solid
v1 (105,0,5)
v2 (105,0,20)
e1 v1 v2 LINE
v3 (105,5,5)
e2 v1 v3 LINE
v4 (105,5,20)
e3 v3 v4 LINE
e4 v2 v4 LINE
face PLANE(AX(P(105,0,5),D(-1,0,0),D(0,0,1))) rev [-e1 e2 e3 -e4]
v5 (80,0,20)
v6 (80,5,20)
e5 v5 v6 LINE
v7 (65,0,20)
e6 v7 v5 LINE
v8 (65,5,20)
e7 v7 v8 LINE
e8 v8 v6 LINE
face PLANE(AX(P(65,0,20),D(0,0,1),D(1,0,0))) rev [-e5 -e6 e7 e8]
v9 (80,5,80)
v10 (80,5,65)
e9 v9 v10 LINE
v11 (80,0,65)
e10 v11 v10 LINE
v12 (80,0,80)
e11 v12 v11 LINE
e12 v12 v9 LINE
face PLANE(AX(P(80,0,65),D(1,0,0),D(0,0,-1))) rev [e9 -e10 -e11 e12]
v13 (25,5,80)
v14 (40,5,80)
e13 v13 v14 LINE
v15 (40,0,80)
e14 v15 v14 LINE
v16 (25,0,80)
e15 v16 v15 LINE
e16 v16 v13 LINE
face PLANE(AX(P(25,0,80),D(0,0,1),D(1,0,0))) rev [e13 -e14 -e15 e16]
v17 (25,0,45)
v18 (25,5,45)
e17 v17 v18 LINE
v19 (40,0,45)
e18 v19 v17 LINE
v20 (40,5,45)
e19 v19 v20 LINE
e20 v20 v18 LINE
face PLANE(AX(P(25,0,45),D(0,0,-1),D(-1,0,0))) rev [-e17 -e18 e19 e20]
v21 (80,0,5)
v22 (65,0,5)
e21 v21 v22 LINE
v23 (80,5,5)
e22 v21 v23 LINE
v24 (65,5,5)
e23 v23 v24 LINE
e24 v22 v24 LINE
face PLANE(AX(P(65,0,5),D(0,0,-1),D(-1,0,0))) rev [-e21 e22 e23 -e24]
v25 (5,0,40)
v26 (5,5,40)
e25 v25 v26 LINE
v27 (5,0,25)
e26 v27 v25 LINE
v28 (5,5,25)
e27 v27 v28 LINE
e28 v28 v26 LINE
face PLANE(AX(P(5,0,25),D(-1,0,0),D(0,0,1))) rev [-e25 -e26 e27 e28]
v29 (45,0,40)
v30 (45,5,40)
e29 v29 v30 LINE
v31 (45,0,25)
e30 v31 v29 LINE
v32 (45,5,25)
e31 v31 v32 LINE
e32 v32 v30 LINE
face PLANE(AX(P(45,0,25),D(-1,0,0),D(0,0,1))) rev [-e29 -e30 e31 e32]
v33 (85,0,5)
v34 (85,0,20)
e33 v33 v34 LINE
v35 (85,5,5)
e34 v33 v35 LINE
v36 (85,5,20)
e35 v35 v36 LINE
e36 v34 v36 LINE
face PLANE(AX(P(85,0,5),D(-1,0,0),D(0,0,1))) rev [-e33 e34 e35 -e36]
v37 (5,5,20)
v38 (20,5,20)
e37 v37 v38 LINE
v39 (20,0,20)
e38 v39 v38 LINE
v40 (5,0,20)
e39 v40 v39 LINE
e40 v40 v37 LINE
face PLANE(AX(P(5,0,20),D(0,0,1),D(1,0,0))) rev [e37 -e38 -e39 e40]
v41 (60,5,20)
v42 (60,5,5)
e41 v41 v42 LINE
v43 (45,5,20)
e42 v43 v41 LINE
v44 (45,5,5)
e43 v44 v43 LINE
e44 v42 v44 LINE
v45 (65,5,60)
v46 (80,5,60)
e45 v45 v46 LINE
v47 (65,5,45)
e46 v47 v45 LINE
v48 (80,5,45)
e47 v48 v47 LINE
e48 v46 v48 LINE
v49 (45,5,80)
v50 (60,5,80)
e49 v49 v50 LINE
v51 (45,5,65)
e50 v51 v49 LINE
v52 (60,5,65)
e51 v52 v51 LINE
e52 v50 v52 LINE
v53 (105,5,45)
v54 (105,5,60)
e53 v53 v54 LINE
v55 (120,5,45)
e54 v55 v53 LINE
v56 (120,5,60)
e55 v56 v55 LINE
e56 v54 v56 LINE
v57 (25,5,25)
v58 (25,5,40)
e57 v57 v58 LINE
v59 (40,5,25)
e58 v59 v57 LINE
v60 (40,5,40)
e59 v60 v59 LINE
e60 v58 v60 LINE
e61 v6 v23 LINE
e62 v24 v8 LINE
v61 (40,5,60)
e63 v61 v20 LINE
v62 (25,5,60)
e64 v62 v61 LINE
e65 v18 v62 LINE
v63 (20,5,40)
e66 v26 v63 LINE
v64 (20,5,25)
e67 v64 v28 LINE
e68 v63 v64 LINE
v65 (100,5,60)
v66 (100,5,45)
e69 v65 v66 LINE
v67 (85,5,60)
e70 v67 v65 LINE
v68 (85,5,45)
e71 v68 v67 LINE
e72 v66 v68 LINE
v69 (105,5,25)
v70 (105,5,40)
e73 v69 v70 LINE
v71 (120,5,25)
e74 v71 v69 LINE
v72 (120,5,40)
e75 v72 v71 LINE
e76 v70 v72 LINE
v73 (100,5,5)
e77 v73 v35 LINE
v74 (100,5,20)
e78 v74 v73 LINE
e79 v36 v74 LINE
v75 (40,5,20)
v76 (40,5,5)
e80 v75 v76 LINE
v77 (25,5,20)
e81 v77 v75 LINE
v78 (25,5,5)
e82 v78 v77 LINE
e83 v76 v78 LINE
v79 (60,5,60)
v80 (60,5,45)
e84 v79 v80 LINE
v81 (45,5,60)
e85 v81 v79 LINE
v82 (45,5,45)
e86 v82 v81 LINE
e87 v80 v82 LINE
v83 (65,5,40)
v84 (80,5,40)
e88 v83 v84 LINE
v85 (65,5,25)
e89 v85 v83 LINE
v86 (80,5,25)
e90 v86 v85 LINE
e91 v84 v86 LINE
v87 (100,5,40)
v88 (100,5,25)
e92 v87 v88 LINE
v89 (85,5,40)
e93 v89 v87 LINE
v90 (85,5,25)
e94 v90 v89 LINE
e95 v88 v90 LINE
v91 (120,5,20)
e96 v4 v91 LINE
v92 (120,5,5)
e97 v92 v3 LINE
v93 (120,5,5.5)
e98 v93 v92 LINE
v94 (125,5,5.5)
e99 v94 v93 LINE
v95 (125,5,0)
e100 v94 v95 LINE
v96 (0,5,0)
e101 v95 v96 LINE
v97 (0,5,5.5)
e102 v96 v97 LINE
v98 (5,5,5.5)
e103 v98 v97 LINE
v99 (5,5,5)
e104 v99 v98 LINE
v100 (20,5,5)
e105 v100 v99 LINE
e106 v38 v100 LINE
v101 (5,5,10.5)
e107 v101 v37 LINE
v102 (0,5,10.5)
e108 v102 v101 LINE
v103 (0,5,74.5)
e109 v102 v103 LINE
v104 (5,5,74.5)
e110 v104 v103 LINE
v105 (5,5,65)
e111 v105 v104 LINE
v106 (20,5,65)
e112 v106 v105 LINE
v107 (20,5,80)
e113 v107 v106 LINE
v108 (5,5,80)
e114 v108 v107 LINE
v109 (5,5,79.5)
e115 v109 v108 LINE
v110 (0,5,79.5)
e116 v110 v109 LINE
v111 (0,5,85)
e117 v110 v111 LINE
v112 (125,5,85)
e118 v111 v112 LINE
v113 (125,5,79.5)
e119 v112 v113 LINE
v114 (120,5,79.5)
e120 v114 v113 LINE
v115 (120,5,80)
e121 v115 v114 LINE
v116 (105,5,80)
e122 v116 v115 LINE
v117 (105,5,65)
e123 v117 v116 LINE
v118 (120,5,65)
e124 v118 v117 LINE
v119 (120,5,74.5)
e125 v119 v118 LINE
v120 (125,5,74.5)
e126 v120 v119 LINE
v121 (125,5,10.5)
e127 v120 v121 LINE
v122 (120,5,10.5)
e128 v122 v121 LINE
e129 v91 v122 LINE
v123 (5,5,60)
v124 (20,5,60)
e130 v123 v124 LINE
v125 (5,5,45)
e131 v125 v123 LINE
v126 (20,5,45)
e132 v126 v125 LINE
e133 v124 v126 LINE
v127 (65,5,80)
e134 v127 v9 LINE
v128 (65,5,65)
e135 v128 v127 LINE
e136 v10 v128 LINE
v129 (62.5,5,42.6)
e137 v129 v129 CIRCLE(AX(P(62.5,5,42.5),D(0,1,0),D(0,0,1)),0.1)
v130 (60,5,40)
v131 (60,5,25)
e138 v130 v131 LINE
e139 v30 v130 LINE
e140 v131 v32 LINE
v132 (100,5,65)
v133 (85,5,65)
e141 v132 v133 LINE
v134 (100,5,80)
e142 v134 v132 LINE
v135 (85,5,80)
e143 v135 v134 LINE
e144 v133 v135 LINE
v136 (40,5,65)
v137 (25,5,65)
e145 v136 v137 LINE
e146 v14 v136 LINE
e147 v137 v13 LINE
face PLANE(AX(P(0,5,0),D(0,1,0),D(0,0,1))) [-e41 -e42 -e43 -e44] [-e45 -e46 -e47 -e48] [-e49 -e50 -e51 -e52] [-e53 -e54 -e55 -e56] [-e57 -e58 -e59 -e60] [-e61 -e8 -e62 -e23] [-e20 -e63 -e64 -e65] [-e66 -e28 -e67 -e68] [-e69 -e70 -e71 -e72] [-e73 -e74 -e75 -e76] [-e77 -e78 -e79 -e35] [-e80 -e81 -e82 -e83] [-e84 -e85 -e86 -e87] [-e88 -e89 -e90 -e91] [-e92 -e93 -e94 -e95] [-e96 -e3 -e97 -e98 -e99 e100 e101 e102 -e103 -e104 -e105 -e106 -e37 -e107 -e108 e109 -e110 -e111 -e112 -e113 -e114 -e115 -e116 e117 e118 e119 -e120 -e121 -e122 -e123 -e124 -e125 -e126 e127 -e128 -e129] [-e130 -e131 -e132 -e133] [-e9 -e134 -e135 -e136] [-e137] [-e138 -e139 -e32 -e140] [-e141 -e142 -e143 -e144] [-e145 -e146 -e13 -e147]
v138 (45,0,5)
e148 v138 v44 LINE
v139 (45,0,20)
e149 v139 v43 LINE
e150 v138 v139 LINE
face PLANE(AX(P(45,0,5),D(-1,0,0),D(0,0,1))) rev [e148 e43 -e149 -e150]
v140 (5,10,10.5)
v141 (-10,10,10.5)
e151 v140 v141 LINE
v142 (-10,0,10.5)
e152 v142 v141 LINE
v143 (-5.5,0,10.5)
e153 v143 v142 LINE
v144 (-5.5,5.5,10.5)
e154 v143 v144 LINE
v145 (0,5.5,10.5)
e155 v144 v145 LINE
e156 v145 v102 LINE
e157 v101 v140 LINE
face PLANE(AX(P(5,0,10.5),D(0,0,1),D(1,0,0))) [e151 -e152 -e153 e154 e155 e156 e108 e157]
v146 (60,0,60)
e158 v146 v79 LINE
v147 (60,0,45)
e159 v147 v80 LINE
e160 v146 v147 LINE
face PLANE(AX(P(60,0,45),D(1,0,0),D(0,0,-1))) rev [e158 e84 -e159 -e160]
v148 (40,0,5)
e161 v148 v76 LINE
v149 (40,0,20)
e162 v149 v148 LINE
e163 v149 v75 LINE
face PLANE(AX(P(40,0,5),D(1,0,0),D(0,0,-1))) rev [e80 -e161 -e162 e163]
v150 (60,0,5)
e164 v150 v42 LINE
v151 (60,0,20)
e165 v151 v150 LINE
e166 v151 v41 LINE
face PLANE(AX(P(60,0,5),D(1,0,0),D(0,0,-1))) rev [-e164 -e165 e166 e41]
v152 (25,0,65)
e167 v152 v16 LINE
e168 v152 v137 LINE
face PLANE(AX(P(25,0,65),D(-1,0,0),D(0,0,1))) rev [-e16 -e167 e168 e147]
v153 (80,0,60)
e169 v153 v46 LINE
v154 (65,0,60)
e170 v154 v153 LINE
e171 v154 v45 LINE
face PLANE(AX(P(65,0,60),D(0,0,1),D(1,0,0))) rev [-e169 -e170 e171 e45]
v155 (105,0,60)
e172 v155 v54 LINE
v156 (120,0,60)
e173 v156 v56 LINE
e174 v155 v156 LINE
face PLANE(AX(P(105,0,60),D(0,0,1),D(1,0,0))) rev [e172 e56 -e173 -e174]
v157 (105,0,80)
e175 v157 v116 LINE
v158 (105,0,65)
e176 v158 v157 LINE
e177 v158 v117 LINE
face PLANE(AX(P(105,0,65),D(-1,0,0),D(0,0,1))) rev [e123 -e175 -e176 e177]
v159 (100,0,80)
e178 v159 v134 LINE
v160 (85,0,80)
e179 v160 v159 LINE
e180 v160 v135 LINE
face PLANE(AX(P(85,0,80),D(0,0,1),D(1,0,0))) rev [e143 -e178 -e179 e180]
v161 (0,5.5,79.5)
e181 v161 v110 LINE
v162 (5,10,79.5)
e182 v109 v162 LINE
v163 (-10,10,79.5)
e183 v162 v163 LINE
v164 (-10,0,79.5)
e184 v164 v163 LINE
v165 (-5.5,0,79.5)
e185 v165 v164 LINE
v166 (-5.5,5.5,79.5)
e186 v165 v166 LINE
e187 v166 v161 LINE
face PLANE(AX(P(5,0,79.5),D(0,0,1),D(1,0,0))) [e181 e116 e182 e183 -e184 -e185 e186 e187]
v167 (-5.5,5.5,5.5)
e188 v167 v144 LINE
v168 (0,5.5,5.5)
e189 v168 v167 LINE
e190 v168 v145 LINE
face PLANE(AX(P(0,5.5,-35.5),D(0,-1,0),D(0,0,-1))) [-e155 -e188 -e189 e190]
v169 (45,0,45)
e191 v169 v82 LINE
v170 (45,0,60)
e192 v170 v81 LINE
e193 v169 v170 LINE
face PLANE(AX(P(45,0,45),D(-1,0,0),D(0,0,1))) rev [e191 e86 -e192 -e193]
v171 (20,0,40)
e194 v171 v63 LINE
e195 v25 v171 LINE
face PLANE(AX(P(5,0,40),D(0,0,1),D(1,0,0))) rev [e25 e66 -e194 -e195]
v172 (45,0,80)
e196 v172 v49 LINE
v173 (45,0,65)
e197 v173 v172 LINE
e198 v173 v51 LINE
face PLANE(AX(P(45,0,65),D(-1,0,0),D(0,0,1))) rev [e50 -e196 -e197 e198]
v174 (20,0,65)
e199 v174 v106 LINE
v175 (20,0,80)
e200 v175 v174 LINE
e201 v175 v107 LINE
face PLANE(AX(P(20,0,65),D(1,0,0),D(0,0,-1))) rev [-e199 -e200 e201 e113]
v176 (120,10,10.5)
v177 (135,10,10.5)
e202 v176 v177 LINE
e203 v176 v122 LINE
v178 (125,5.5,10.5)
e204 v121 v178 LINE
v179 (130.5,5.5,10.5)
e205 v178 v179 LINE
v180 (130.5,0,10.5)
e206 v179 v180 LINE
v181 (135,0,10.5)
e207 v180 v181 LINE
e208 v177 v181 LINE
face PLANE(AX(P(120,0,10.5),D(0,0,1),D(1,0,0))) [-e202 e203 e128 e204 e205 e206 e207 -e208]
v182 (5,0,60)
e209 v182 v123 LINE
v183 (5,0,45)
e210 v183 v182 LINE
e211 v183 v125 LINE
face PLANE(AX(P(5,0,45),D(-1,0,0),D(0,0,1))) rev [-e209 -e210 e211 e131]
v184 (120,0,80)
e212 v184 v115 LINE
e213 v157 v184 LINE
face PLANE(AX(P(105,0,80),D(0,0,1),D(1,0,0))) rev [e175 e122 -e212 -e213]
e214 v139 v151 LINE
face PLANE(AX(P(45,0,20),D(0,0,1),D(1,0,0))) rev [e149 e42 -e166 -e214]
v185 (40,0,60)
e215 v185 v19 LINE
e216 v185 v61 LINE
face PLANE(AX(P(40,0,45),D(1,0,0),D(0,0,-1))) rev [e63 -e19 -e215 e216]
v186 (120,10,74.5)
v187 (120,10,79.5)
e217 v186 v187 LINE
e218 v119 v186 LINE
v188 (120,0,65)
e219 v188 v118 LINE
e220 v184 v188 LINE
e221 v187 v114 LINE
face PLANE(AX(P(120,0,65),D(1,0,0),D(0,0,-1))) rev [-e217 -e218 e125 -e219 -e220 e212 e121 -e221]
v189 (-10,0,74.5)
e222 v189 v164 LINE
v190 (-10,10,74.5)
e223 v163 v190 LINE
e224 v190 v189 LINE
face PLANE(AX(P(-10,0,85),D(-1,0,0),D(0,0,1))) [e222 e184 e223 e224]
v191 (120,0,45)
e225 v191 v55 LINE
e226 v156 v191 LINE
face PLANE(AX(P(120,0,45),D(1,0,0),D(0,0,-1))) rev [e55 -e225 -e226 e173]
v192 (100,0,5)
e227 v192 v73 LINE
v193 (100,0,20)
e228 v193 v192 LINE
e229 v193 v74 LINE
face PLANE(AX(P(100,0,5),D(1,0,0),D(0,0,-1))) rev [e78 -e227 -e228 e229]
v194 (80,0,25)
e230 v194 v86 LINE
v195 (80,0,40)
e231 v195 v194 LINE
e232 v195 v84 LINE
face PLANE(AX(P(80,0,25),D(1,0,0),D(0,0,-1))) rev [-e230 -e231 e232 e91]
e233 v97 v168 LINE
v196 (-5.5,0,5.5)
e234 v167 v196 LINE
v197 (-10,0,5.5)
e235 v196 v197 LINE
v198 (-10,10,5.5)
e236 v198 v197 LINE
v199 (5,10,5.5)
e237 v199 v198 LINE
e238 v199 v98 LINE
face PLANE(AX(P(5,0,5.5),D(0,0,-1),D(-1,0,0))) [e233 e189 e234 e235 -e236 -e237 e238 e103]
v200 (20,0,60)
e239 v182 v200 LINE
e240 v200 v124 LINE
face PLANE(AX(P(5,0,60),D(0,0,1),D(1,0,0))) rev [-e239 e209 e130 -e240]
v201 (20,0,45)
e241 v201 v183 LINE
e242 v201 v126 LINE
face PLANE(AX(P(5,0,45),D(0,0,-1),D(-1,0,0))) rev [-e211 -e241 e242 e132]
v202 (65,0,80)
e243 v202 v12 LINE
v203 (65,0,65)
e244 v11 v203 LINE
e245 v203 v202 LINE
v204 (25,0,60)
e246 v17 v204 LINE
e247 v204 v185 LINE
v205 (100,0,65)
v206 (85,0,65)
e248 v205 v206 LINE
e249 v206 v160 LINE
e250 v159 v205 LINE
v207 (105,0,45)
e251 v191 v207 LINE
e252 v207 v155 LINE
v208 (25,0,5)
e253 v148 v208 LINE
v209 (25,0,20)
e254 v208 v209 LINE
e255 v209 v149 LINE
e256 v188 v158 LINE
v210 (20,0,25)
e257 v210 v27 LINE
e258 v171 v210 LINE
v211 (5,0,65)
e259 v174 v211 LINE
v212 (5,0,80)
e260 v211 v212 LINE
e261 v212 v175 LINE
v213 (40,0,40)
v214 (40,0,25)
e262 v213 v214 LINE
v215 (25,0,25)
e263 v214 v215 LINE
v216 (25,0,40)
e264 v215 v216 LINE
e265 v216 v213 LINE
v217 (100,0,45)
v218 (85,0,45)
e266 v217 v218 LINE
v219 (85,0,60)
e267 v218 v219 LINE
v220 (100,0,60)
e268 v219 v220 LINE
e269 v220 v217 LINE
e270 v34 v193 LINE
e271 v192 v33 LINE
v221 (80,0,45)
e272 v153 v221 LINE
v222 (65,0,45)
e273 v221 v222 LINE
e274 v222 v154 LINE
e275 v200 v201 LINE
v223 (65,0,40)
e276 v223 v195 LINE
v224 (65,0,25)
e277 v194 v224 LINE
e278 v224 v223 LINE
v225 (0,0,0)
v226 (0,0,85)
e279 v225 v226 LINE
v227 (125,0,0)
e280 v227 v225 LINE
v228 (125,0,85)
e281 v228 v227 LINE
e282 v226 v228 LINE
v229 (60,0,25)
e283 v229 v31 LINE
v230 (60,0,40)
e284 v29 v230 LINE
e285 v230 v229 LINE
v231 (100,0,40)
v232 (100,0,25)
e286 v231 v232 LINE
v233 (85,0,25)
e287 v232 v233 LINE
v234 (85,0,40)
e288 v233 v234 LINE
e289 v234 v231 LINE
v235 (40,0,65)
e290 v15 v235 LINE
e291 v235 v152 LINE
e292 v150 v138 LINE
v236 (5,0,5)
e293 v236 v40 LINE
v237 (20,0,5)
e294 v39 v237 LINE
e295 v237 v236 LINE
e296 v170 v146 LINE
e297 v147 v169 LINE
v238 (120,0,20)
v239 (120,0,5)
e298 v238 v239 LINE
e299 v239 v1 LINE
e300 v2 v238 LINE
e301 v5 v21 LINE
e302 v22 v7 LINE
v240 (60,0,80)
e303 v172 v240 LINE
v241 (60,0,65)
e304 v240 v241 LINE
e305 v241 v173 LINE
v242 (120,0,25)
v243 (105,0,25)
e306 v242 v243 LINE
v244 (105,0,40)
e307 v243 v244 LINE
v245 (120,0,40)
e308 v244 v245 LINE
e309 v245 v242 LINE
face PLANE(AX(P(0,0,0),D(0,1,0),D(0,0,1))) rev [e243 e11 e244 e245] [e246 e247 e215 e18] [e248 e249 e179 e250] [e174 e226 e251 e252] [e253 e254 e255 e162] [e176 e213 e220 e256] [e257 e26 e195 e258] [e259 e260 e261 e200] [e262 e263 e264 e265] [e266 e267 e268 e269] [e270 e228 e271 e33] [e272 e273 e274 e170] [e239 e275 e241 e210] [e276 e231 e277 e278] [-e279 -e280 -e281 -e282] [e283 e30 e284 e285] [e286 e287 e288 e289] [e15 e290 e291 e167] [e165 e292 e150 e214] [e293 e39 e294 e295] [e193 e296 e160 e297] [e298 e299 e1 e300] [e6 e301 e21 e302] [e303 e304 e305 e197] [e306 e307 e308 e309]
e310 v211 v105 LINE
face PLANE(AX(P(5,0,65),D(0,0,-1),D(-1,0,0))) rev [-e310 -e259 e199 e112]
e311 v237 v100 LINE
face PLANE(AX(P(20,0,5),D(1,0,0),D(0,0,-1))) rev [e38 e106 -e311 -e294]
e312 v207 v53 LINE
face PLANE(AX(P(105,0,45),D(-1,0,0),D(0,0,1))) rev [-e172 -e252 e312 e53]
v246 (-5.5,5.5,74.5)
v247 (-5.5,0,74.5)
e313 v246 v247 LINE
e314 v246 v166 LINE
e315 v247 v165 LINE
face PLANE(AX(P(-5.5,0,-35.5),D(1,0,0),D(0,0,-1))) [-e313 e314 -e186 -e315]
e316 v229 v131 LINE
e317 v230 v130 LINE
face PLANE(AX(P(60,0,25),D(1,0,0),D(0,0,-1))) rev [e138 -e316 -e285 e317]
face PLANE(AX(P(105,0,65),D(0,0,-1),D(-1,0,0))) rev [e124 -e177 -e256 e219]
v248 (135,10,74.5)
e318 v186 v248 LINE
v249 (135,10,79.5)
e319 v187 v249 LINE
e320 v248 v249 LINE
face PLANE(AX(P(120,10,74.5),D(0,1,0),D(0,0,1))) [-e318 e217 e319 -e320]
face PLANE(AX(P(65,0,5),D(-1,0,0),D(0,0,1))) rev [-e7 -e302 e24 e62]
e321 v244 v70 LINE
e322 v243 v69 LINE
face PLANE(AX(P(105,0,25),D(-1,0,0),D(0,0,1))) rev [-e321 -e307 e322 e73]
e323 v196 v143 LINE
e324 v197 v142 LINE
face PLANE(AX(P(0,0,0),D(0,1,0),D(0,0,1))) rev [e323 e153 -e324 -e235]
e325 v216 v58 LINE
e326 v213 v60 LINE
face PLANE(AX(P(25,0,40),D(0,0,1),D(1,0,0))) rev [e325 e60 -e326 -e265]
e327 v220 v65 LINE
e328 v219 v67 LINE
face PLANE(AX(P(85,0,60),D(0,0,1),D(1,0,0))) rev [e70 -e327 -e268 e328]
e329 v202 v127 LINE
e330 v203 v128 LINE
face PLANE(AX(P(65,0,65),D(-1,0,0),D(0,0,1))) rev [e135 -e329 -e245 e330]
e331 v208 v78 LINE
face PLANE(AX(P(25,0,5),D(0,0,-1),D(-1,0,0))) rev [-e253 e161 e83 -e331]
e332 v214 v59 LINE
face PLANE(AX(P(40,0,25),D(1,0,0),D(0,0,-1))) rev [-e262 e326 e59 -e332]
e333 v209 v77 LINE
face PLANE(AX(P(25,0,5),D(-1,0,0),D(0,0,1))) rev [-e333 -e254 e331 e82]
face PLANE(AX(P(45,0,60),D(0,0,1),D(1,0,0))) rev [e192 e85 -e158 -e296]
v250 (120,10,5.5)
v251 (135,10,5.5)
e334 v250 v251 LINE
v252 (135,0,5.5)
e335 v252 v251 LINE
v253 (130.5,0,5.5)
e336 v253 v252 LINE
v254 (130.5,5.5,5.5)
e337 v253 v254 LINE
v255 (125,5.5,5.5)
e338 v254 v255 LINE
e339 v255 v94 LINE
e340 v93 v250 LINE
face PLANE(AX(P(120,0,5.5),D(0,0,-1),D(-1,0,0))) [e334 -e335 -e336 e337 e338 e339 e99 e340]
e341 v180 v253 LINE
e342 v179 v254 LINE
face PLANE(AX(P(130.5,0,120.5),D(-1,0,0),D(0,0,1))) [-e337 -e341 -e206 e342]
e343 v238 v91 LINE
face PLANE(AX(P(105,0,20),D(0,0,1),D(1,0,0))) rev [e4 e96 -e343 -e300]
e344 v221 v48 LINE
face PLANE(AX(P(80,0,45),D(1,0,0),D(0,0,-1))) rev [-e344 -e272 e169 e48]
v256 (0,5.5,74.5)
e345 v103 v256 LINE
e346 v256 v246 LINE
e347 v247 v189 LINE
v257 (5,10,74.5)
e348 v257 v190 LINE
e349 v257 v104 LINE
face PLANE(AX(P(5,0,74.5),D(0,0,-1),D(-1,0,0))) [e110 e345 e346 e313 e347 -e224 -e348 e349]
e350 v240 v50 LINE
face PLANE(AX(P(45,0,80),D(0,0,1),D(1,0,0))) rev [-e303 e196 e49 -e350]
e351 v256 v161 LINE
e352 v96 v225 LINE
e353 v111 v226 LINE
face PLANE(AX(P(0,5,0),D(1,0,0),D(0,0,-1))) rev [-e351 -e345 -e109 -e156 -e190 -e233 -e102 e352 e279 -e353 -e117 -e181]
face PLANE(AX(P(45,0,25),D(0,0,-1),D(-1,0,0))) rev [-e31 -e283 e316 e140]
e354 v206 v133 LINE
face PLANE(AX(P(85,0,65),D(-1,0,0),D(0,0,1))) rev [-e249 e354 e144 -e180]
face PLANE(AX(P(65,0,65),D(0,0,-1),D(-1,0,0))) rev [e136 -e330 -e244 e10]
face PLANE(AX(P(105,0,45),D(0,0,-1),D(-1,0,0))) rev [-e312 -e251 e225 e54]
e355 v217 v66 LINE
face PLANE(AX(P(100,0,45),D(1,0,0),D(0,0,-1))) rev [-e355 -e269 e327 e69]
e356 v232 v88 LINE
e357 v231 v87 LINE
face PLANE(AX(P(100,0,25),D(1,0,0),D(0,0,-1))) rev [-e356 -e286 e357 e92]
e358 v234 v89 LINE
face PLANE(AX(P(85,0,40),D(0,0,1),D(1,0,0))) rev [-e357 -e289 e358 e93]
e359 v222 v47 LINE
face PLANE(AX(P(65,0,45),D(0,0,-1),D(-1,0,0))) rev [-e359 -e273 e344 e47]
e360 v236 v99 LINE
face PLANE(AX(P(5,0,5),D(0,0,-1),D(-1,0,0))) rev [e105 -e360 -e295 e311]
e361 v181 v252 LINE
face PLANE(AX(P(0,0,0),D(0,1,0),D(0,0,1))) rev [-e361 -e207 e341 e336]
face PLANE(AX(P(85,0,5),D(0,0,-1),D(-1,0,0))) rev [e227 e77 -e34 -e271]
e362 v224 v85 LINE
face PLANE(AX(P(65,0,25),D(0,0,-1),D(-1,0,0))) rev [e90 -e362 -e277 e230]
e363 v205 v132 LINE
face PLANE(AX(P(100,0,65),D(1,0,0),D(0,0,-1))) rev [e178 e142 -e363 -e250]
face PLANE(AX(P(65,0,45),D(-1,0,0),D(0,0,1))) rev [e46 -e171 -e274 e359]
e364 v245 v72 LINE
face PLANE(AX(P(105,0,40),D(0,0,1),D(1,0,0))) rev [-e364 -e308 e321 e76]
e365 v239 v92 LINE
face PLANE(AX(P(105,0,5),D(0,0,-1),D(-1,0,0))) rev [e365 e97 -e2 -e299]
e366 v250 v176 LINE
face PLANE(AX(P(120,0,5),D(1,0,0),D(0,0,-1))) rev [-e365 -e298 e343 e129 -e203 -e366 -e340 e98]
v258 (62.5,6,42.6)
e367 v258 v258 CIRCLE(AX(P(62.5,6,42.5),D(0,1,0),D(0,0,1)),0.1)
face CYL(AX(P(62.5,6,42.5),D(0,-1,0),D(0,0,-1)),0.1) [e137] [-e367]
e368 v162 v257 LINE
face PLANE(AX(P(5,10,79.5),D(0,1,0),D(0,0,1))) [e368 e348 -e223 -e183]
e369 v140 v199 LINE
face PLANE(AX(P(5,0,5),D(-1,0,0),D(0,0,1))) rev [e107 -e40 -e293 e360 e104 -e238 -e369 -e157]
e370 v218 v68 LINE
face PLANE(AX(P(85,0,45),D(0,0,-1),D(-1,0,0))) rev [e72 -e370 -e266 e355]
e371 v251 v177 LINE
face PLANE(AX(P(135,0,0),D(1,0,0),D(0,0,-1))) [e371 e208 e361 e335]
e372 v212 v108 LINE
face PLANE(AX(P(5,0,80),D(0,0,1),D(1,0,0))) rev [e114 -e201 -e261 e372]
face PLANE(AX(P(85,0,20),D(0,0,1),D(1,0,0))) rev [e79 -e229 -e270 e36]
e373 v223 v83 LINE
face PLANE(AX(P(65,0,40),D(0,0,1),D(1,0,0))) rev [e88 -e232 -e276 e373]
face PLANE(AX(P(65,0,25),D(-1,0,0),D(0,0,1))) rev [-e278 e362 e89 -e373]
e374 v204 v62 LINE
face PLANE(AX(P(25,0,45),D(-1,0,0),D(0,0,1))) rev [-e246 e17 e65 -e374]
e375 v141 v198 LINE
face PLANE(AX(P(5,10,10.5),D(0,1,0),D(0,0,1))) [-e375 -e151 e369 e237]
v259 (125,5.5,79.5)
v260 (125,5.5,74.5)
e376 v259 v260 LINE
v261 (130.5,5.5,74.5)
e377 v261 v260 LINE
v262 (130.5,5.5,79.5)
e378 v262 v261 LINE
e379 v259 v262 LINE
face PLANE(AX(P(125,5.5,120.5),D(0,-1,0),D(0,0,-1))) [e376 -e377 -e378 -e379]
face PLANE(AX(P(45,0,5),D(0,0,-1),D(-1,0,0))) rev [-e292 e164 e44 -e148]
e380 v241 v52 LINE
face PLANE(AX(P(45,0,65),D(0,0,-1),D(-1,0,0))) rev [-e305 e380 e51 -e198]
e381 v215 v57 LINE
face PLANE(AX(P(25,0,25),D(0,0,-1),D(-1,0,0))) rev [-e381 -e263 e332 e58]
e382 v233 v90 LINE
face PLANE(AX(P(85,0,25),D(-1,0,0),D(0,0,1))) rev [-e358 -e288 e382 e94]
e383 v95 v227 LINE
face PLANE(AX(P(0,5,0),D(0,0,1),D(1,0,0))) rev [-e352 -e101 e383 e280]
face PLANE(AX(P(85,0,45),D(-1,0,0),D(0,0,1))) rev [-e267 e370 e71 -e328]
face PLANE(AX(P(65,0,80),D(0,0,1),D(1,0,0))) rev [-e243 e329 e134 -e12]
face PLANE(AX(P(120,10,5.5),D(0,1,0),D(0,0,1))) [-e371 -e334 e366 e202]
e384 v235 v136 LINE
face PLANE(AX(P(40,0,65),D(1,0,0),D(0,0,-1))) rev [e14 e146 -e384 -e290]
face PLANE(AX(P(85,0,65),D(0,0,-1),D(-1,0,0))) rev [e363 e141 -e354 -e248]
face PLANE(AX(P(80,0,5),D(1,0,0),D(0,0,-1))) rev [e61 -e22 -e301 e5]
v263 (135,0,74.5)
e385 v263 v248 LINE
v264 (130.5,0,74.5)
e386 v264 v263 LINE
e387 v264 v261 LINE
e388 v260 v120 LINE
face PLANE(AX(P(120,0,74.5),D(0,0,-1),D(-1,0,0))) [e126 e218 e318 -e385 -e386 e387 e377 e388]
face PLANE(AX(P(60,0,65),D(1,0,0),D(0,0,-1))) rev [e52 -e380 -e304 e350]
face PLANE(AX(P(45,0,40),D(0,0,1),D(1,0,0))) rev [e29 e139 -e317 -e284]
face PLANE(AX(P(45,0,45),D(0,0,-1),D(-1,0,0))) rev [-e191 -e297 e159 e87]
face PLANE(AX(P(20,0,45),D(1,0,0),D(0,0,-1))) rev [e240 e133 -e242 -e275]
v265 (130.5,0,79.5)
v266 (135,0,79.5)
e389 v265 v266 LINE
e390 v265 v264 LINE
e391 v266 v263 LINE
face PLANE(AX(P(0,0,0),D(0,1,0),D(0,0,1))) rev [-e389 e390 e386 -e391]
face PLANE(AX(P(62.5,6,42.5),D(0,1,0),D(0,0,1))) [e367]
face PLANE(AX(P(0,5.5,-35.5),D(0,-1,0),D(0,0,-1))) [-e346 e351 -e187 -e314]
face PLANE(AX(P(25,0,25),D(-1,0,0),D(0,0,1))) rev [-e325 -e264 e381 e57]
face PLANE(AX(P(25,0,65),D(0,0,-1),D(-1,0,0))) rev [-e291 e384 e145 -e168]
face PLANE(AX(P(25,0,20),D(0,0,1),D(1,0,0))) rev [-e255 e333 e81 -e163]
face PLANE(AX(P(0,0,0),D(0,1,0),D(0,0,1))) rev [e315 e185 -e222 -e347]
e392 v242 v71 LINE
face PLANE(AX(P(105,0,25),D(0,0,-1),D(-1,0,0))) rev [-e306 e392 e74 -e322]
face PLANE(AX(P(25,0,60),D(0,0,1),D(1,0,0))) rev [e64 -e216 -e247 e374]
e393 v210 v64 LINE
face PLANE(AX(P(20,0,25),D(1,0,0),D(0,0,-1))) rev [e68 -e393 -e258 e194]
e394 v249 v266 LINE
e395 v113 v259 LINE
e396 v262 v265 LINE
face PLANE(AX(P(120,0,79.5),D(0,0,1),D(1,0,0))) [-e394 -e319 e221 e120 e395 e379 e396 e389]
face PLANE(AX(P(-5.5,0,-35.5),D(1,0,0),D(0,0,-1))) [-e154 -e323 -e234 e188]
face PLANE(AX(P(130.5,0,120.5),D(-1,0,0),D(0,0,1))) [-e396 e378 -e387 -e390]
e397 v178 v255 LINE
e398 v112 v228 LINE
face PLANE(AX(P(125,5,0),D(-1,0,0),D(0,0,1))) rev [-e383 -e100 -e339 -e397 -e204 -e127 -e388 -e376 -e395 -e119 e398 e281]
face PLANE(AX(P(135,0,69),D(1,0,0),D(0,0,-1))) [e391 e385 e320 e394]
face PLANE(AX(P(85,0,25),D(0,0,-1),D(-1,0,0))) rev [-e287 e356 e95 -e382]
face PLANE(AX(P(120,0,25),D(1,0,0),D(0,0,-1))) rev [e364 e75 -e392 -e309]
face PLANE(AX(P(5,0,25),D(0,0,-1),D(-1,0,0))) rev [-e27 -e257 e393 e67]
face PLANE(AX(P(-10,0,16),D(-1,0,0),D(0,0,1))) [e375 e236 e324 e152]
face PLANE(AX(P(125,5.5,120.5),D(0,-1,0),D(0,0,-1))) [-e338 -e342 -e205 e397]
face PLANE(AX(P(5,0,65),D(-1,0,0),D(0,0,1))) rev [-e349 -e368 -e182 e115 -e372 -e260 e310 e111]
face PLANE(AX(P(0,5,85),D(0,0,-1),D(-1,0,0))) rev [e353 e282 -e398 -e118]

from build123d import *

# Parameters (mm, degrees)
SKETCH_1_W                     = 125
SKETCH_1_H                     = 85
EXTRUDE_1_DEPTH                = 5
SKETCH_2_W                     = 15
SKETCH_2_H                     = 15
CUT_EXTRUDE_1_DEPTH            = 5
PATTERN_LINEAR_1_COUNT         = 6
PATTERN_LINEAR_1_PITCH         = 20
PATTERN_LINEAR_1_COUNT_DIR2    = 4
PATTERN_LINEAR_1_PITCH_DIR2    = 20
EXTRUDE_START                  = -5
SKETCH_3_W                     = 5
SKETCH_3_H                     = 10
EXTRUDE_2_DEPTH                = 15
PATTERN_LINEAR_2_COUNT         = 2
PATTERN_LINEAR_2_PITCH         = 69
CUT_EXTRUDE_START              = -15
SKETCH_5_W                     = 5.5
SKETCH_5_H                     = 5.5
CUT_EXTRUDE_3_DEPTH            = 125
SKETCH_9_R                     = 0.1
EXTRUDE_3_DEPTH                = 1
PATTERN_CIRCULAR_1_OUTLINE_W   = 4.5
PATTERN_CIRCULAR_1_OUTLINE_H   = 5
PATTERN_CIRCULAR_1_OUTLINE_W_2 = 5
PATTERN_CIRCULAR_1_DEPTH       = 10
PATTERN_START                  = 5.5
PATTERN_CIRCULAR_1_2_OUTLINE_W = 5.5
PATTERN_CIRCULAR_1_2_OUTLINE_H = 5
PATTERN_CIRCULAR_1_2_DEPTH     = 4.5


# Read off the part's stored shape, not the designer's step: 阵列(圆周)1
with BuildPart() as part:
    # 草图1 → 凸台-拉伸1 (new body)
    with BuildSketch(Plane(origin=(0, 0, 0), x_dir=(1, 0, 0), z_dir=(0, 1, 0))):
        with Locations((62.5, -42.5)):
            Rectangle(SKETCH_1_W, SKETCH_1_H)
    extrude(amount=EXTRUDE_1_DEPTH)

    # 草图2 → 切除-拉伸1 (cut)
    with BuildSketch(Plane(origin=(0, 5, 0), x_dir=(1, 0, 0), z_dir=(0, 1, 0))):
        with Locations((12.5, -12.5)):
            Rectangle(SKETCH_2_W, SKETCH_2_H)
    cut_extrude_1 = extrude(amount=-CUT_EXTRUDE_1_DEPTH, mode=Mode.SUBTRACT)

    # 阵列(线性)1: Cut-Extrude 1 6 × 4
    with Locations(*[(i * PATTERN_LINEAR_1_PITCH, 0, j * PATTERN_LINEAR_1_PITCH_DIR2) for i in range(PATTERN_LINEAR_1_COUNT) for j in range(PATTERN_LINEAR_1_COUNT_DIR2) if (i, j) != (0, 0)]):
        add(cut_extrude_1, mode=Mode.SUBTRACT)

    # 草图3 → 凸台-拉伸2 (add)
    with BuildSketch(Plane(origin=(125, 0, 0), x_dir=(0, 0, -1), z_dir=(1, 0, 0)).offset(EXTRUDE_START)):
        with Locations((-8, 5)):
            Rectangle(SKETCH_3_W, SKETCH_3_H)
    extrude_2 = extrude(amount=EXTRUDE_2_DEPTH)

    # 阵列(线性)2: 凸台-拉伸2 ×2
    with Locations(*[(0, 0, i * PATTERN_LINEAR_2_PITCH) for i in range(1, PATTERN_LINEAR_2_COUNT)]):
        add(extrude_2)

    # 草图5 → 切除-拉伸3 (cut)
    with BuildSketch(Plane.XY.offset(10.5).offset(CUT_EXTRUDE_START)):
        with Locations((127.75, 2.75)):
            Rectangle(SKETCH_5_W, SKETCH_5_H)
    extrude(amount=CUT_EXTRUDE_3_DEPTH, mode=Mode.SUBTRACT)

    # 草图9 → 凸台-拉伸3 (add)
    with BuildSketch(Plane(origin=(0, 5, 0), x_dir=(1, 0, 0), z_dir=(0, 1, 0))):
        with Locations(Location((62.5, -42.5, 0), (0, 0, 270))):
            Circle(SKETCH_9_R)
    extrude(amount=EXTRUDE_3_DEPTH)

    # 阵列(圆周)1 outline → 阵列(圆周)1 (add)
    with BuildSketch(Plane(origin=(0, 0, 0), x_dir=(1, 0, 0), z_dir=(0, 1, 0))):
        with Locations((-7.75, -77)):
            Rectangle(PATTERN_CIRCULAR_1_OUTLINE_W, PATTERN_CIRCULAR_1_OUTLINE_H)
        with Locations((2.5, -8)):
            Rectangle(PATTERN_CIRCULAR_1_OUTLINE_W_2, PATTERN_CIRCULAR_1_OUTLINE_H)
        with Locations((2.5, -77)):
            Rectangle(PATTERN_CIRCULAR_1_OUTLINE_W_2, PATTERN_CIRCULAR_1_OUTLINE_H)
        with Locations((-7.75, -8)):
            Rectangle(PATTERN_CIRCULAR_1_OUTLINE_W, PATTERN_CIRCULAR_1_OUTLINE_H)
    extrude(amount=PATTERN_CIRCULAR_1_DEPTH)

    # Pattern Circular 1 2 outline → Pattern Circular 1 2 (add)
    with BuildSketch(Plane(origin=(0, 0, 0), x_dir=(1, 0, 0), z_dir=(0, 1, 0)).offset(PATTERN_START)):
        with Locations((-2.75, -8)):
            Rectangle(PATTERN_CIRCULAR_1_2_OUTLINE_W, PATTERN_CIRCULAR_1_2_OUTLINE_H)
        with Locations((-2.75, -77)):
            Rectangle(PATTERN_CIRCULAR_1_2_OUTLINE_W, PATTERN_CIRCULAR_1_2_OUTLINE_H)
    extrude(amount=PATTERN_CIRCULAR_1_2_DEPTH)


solid = part.part
